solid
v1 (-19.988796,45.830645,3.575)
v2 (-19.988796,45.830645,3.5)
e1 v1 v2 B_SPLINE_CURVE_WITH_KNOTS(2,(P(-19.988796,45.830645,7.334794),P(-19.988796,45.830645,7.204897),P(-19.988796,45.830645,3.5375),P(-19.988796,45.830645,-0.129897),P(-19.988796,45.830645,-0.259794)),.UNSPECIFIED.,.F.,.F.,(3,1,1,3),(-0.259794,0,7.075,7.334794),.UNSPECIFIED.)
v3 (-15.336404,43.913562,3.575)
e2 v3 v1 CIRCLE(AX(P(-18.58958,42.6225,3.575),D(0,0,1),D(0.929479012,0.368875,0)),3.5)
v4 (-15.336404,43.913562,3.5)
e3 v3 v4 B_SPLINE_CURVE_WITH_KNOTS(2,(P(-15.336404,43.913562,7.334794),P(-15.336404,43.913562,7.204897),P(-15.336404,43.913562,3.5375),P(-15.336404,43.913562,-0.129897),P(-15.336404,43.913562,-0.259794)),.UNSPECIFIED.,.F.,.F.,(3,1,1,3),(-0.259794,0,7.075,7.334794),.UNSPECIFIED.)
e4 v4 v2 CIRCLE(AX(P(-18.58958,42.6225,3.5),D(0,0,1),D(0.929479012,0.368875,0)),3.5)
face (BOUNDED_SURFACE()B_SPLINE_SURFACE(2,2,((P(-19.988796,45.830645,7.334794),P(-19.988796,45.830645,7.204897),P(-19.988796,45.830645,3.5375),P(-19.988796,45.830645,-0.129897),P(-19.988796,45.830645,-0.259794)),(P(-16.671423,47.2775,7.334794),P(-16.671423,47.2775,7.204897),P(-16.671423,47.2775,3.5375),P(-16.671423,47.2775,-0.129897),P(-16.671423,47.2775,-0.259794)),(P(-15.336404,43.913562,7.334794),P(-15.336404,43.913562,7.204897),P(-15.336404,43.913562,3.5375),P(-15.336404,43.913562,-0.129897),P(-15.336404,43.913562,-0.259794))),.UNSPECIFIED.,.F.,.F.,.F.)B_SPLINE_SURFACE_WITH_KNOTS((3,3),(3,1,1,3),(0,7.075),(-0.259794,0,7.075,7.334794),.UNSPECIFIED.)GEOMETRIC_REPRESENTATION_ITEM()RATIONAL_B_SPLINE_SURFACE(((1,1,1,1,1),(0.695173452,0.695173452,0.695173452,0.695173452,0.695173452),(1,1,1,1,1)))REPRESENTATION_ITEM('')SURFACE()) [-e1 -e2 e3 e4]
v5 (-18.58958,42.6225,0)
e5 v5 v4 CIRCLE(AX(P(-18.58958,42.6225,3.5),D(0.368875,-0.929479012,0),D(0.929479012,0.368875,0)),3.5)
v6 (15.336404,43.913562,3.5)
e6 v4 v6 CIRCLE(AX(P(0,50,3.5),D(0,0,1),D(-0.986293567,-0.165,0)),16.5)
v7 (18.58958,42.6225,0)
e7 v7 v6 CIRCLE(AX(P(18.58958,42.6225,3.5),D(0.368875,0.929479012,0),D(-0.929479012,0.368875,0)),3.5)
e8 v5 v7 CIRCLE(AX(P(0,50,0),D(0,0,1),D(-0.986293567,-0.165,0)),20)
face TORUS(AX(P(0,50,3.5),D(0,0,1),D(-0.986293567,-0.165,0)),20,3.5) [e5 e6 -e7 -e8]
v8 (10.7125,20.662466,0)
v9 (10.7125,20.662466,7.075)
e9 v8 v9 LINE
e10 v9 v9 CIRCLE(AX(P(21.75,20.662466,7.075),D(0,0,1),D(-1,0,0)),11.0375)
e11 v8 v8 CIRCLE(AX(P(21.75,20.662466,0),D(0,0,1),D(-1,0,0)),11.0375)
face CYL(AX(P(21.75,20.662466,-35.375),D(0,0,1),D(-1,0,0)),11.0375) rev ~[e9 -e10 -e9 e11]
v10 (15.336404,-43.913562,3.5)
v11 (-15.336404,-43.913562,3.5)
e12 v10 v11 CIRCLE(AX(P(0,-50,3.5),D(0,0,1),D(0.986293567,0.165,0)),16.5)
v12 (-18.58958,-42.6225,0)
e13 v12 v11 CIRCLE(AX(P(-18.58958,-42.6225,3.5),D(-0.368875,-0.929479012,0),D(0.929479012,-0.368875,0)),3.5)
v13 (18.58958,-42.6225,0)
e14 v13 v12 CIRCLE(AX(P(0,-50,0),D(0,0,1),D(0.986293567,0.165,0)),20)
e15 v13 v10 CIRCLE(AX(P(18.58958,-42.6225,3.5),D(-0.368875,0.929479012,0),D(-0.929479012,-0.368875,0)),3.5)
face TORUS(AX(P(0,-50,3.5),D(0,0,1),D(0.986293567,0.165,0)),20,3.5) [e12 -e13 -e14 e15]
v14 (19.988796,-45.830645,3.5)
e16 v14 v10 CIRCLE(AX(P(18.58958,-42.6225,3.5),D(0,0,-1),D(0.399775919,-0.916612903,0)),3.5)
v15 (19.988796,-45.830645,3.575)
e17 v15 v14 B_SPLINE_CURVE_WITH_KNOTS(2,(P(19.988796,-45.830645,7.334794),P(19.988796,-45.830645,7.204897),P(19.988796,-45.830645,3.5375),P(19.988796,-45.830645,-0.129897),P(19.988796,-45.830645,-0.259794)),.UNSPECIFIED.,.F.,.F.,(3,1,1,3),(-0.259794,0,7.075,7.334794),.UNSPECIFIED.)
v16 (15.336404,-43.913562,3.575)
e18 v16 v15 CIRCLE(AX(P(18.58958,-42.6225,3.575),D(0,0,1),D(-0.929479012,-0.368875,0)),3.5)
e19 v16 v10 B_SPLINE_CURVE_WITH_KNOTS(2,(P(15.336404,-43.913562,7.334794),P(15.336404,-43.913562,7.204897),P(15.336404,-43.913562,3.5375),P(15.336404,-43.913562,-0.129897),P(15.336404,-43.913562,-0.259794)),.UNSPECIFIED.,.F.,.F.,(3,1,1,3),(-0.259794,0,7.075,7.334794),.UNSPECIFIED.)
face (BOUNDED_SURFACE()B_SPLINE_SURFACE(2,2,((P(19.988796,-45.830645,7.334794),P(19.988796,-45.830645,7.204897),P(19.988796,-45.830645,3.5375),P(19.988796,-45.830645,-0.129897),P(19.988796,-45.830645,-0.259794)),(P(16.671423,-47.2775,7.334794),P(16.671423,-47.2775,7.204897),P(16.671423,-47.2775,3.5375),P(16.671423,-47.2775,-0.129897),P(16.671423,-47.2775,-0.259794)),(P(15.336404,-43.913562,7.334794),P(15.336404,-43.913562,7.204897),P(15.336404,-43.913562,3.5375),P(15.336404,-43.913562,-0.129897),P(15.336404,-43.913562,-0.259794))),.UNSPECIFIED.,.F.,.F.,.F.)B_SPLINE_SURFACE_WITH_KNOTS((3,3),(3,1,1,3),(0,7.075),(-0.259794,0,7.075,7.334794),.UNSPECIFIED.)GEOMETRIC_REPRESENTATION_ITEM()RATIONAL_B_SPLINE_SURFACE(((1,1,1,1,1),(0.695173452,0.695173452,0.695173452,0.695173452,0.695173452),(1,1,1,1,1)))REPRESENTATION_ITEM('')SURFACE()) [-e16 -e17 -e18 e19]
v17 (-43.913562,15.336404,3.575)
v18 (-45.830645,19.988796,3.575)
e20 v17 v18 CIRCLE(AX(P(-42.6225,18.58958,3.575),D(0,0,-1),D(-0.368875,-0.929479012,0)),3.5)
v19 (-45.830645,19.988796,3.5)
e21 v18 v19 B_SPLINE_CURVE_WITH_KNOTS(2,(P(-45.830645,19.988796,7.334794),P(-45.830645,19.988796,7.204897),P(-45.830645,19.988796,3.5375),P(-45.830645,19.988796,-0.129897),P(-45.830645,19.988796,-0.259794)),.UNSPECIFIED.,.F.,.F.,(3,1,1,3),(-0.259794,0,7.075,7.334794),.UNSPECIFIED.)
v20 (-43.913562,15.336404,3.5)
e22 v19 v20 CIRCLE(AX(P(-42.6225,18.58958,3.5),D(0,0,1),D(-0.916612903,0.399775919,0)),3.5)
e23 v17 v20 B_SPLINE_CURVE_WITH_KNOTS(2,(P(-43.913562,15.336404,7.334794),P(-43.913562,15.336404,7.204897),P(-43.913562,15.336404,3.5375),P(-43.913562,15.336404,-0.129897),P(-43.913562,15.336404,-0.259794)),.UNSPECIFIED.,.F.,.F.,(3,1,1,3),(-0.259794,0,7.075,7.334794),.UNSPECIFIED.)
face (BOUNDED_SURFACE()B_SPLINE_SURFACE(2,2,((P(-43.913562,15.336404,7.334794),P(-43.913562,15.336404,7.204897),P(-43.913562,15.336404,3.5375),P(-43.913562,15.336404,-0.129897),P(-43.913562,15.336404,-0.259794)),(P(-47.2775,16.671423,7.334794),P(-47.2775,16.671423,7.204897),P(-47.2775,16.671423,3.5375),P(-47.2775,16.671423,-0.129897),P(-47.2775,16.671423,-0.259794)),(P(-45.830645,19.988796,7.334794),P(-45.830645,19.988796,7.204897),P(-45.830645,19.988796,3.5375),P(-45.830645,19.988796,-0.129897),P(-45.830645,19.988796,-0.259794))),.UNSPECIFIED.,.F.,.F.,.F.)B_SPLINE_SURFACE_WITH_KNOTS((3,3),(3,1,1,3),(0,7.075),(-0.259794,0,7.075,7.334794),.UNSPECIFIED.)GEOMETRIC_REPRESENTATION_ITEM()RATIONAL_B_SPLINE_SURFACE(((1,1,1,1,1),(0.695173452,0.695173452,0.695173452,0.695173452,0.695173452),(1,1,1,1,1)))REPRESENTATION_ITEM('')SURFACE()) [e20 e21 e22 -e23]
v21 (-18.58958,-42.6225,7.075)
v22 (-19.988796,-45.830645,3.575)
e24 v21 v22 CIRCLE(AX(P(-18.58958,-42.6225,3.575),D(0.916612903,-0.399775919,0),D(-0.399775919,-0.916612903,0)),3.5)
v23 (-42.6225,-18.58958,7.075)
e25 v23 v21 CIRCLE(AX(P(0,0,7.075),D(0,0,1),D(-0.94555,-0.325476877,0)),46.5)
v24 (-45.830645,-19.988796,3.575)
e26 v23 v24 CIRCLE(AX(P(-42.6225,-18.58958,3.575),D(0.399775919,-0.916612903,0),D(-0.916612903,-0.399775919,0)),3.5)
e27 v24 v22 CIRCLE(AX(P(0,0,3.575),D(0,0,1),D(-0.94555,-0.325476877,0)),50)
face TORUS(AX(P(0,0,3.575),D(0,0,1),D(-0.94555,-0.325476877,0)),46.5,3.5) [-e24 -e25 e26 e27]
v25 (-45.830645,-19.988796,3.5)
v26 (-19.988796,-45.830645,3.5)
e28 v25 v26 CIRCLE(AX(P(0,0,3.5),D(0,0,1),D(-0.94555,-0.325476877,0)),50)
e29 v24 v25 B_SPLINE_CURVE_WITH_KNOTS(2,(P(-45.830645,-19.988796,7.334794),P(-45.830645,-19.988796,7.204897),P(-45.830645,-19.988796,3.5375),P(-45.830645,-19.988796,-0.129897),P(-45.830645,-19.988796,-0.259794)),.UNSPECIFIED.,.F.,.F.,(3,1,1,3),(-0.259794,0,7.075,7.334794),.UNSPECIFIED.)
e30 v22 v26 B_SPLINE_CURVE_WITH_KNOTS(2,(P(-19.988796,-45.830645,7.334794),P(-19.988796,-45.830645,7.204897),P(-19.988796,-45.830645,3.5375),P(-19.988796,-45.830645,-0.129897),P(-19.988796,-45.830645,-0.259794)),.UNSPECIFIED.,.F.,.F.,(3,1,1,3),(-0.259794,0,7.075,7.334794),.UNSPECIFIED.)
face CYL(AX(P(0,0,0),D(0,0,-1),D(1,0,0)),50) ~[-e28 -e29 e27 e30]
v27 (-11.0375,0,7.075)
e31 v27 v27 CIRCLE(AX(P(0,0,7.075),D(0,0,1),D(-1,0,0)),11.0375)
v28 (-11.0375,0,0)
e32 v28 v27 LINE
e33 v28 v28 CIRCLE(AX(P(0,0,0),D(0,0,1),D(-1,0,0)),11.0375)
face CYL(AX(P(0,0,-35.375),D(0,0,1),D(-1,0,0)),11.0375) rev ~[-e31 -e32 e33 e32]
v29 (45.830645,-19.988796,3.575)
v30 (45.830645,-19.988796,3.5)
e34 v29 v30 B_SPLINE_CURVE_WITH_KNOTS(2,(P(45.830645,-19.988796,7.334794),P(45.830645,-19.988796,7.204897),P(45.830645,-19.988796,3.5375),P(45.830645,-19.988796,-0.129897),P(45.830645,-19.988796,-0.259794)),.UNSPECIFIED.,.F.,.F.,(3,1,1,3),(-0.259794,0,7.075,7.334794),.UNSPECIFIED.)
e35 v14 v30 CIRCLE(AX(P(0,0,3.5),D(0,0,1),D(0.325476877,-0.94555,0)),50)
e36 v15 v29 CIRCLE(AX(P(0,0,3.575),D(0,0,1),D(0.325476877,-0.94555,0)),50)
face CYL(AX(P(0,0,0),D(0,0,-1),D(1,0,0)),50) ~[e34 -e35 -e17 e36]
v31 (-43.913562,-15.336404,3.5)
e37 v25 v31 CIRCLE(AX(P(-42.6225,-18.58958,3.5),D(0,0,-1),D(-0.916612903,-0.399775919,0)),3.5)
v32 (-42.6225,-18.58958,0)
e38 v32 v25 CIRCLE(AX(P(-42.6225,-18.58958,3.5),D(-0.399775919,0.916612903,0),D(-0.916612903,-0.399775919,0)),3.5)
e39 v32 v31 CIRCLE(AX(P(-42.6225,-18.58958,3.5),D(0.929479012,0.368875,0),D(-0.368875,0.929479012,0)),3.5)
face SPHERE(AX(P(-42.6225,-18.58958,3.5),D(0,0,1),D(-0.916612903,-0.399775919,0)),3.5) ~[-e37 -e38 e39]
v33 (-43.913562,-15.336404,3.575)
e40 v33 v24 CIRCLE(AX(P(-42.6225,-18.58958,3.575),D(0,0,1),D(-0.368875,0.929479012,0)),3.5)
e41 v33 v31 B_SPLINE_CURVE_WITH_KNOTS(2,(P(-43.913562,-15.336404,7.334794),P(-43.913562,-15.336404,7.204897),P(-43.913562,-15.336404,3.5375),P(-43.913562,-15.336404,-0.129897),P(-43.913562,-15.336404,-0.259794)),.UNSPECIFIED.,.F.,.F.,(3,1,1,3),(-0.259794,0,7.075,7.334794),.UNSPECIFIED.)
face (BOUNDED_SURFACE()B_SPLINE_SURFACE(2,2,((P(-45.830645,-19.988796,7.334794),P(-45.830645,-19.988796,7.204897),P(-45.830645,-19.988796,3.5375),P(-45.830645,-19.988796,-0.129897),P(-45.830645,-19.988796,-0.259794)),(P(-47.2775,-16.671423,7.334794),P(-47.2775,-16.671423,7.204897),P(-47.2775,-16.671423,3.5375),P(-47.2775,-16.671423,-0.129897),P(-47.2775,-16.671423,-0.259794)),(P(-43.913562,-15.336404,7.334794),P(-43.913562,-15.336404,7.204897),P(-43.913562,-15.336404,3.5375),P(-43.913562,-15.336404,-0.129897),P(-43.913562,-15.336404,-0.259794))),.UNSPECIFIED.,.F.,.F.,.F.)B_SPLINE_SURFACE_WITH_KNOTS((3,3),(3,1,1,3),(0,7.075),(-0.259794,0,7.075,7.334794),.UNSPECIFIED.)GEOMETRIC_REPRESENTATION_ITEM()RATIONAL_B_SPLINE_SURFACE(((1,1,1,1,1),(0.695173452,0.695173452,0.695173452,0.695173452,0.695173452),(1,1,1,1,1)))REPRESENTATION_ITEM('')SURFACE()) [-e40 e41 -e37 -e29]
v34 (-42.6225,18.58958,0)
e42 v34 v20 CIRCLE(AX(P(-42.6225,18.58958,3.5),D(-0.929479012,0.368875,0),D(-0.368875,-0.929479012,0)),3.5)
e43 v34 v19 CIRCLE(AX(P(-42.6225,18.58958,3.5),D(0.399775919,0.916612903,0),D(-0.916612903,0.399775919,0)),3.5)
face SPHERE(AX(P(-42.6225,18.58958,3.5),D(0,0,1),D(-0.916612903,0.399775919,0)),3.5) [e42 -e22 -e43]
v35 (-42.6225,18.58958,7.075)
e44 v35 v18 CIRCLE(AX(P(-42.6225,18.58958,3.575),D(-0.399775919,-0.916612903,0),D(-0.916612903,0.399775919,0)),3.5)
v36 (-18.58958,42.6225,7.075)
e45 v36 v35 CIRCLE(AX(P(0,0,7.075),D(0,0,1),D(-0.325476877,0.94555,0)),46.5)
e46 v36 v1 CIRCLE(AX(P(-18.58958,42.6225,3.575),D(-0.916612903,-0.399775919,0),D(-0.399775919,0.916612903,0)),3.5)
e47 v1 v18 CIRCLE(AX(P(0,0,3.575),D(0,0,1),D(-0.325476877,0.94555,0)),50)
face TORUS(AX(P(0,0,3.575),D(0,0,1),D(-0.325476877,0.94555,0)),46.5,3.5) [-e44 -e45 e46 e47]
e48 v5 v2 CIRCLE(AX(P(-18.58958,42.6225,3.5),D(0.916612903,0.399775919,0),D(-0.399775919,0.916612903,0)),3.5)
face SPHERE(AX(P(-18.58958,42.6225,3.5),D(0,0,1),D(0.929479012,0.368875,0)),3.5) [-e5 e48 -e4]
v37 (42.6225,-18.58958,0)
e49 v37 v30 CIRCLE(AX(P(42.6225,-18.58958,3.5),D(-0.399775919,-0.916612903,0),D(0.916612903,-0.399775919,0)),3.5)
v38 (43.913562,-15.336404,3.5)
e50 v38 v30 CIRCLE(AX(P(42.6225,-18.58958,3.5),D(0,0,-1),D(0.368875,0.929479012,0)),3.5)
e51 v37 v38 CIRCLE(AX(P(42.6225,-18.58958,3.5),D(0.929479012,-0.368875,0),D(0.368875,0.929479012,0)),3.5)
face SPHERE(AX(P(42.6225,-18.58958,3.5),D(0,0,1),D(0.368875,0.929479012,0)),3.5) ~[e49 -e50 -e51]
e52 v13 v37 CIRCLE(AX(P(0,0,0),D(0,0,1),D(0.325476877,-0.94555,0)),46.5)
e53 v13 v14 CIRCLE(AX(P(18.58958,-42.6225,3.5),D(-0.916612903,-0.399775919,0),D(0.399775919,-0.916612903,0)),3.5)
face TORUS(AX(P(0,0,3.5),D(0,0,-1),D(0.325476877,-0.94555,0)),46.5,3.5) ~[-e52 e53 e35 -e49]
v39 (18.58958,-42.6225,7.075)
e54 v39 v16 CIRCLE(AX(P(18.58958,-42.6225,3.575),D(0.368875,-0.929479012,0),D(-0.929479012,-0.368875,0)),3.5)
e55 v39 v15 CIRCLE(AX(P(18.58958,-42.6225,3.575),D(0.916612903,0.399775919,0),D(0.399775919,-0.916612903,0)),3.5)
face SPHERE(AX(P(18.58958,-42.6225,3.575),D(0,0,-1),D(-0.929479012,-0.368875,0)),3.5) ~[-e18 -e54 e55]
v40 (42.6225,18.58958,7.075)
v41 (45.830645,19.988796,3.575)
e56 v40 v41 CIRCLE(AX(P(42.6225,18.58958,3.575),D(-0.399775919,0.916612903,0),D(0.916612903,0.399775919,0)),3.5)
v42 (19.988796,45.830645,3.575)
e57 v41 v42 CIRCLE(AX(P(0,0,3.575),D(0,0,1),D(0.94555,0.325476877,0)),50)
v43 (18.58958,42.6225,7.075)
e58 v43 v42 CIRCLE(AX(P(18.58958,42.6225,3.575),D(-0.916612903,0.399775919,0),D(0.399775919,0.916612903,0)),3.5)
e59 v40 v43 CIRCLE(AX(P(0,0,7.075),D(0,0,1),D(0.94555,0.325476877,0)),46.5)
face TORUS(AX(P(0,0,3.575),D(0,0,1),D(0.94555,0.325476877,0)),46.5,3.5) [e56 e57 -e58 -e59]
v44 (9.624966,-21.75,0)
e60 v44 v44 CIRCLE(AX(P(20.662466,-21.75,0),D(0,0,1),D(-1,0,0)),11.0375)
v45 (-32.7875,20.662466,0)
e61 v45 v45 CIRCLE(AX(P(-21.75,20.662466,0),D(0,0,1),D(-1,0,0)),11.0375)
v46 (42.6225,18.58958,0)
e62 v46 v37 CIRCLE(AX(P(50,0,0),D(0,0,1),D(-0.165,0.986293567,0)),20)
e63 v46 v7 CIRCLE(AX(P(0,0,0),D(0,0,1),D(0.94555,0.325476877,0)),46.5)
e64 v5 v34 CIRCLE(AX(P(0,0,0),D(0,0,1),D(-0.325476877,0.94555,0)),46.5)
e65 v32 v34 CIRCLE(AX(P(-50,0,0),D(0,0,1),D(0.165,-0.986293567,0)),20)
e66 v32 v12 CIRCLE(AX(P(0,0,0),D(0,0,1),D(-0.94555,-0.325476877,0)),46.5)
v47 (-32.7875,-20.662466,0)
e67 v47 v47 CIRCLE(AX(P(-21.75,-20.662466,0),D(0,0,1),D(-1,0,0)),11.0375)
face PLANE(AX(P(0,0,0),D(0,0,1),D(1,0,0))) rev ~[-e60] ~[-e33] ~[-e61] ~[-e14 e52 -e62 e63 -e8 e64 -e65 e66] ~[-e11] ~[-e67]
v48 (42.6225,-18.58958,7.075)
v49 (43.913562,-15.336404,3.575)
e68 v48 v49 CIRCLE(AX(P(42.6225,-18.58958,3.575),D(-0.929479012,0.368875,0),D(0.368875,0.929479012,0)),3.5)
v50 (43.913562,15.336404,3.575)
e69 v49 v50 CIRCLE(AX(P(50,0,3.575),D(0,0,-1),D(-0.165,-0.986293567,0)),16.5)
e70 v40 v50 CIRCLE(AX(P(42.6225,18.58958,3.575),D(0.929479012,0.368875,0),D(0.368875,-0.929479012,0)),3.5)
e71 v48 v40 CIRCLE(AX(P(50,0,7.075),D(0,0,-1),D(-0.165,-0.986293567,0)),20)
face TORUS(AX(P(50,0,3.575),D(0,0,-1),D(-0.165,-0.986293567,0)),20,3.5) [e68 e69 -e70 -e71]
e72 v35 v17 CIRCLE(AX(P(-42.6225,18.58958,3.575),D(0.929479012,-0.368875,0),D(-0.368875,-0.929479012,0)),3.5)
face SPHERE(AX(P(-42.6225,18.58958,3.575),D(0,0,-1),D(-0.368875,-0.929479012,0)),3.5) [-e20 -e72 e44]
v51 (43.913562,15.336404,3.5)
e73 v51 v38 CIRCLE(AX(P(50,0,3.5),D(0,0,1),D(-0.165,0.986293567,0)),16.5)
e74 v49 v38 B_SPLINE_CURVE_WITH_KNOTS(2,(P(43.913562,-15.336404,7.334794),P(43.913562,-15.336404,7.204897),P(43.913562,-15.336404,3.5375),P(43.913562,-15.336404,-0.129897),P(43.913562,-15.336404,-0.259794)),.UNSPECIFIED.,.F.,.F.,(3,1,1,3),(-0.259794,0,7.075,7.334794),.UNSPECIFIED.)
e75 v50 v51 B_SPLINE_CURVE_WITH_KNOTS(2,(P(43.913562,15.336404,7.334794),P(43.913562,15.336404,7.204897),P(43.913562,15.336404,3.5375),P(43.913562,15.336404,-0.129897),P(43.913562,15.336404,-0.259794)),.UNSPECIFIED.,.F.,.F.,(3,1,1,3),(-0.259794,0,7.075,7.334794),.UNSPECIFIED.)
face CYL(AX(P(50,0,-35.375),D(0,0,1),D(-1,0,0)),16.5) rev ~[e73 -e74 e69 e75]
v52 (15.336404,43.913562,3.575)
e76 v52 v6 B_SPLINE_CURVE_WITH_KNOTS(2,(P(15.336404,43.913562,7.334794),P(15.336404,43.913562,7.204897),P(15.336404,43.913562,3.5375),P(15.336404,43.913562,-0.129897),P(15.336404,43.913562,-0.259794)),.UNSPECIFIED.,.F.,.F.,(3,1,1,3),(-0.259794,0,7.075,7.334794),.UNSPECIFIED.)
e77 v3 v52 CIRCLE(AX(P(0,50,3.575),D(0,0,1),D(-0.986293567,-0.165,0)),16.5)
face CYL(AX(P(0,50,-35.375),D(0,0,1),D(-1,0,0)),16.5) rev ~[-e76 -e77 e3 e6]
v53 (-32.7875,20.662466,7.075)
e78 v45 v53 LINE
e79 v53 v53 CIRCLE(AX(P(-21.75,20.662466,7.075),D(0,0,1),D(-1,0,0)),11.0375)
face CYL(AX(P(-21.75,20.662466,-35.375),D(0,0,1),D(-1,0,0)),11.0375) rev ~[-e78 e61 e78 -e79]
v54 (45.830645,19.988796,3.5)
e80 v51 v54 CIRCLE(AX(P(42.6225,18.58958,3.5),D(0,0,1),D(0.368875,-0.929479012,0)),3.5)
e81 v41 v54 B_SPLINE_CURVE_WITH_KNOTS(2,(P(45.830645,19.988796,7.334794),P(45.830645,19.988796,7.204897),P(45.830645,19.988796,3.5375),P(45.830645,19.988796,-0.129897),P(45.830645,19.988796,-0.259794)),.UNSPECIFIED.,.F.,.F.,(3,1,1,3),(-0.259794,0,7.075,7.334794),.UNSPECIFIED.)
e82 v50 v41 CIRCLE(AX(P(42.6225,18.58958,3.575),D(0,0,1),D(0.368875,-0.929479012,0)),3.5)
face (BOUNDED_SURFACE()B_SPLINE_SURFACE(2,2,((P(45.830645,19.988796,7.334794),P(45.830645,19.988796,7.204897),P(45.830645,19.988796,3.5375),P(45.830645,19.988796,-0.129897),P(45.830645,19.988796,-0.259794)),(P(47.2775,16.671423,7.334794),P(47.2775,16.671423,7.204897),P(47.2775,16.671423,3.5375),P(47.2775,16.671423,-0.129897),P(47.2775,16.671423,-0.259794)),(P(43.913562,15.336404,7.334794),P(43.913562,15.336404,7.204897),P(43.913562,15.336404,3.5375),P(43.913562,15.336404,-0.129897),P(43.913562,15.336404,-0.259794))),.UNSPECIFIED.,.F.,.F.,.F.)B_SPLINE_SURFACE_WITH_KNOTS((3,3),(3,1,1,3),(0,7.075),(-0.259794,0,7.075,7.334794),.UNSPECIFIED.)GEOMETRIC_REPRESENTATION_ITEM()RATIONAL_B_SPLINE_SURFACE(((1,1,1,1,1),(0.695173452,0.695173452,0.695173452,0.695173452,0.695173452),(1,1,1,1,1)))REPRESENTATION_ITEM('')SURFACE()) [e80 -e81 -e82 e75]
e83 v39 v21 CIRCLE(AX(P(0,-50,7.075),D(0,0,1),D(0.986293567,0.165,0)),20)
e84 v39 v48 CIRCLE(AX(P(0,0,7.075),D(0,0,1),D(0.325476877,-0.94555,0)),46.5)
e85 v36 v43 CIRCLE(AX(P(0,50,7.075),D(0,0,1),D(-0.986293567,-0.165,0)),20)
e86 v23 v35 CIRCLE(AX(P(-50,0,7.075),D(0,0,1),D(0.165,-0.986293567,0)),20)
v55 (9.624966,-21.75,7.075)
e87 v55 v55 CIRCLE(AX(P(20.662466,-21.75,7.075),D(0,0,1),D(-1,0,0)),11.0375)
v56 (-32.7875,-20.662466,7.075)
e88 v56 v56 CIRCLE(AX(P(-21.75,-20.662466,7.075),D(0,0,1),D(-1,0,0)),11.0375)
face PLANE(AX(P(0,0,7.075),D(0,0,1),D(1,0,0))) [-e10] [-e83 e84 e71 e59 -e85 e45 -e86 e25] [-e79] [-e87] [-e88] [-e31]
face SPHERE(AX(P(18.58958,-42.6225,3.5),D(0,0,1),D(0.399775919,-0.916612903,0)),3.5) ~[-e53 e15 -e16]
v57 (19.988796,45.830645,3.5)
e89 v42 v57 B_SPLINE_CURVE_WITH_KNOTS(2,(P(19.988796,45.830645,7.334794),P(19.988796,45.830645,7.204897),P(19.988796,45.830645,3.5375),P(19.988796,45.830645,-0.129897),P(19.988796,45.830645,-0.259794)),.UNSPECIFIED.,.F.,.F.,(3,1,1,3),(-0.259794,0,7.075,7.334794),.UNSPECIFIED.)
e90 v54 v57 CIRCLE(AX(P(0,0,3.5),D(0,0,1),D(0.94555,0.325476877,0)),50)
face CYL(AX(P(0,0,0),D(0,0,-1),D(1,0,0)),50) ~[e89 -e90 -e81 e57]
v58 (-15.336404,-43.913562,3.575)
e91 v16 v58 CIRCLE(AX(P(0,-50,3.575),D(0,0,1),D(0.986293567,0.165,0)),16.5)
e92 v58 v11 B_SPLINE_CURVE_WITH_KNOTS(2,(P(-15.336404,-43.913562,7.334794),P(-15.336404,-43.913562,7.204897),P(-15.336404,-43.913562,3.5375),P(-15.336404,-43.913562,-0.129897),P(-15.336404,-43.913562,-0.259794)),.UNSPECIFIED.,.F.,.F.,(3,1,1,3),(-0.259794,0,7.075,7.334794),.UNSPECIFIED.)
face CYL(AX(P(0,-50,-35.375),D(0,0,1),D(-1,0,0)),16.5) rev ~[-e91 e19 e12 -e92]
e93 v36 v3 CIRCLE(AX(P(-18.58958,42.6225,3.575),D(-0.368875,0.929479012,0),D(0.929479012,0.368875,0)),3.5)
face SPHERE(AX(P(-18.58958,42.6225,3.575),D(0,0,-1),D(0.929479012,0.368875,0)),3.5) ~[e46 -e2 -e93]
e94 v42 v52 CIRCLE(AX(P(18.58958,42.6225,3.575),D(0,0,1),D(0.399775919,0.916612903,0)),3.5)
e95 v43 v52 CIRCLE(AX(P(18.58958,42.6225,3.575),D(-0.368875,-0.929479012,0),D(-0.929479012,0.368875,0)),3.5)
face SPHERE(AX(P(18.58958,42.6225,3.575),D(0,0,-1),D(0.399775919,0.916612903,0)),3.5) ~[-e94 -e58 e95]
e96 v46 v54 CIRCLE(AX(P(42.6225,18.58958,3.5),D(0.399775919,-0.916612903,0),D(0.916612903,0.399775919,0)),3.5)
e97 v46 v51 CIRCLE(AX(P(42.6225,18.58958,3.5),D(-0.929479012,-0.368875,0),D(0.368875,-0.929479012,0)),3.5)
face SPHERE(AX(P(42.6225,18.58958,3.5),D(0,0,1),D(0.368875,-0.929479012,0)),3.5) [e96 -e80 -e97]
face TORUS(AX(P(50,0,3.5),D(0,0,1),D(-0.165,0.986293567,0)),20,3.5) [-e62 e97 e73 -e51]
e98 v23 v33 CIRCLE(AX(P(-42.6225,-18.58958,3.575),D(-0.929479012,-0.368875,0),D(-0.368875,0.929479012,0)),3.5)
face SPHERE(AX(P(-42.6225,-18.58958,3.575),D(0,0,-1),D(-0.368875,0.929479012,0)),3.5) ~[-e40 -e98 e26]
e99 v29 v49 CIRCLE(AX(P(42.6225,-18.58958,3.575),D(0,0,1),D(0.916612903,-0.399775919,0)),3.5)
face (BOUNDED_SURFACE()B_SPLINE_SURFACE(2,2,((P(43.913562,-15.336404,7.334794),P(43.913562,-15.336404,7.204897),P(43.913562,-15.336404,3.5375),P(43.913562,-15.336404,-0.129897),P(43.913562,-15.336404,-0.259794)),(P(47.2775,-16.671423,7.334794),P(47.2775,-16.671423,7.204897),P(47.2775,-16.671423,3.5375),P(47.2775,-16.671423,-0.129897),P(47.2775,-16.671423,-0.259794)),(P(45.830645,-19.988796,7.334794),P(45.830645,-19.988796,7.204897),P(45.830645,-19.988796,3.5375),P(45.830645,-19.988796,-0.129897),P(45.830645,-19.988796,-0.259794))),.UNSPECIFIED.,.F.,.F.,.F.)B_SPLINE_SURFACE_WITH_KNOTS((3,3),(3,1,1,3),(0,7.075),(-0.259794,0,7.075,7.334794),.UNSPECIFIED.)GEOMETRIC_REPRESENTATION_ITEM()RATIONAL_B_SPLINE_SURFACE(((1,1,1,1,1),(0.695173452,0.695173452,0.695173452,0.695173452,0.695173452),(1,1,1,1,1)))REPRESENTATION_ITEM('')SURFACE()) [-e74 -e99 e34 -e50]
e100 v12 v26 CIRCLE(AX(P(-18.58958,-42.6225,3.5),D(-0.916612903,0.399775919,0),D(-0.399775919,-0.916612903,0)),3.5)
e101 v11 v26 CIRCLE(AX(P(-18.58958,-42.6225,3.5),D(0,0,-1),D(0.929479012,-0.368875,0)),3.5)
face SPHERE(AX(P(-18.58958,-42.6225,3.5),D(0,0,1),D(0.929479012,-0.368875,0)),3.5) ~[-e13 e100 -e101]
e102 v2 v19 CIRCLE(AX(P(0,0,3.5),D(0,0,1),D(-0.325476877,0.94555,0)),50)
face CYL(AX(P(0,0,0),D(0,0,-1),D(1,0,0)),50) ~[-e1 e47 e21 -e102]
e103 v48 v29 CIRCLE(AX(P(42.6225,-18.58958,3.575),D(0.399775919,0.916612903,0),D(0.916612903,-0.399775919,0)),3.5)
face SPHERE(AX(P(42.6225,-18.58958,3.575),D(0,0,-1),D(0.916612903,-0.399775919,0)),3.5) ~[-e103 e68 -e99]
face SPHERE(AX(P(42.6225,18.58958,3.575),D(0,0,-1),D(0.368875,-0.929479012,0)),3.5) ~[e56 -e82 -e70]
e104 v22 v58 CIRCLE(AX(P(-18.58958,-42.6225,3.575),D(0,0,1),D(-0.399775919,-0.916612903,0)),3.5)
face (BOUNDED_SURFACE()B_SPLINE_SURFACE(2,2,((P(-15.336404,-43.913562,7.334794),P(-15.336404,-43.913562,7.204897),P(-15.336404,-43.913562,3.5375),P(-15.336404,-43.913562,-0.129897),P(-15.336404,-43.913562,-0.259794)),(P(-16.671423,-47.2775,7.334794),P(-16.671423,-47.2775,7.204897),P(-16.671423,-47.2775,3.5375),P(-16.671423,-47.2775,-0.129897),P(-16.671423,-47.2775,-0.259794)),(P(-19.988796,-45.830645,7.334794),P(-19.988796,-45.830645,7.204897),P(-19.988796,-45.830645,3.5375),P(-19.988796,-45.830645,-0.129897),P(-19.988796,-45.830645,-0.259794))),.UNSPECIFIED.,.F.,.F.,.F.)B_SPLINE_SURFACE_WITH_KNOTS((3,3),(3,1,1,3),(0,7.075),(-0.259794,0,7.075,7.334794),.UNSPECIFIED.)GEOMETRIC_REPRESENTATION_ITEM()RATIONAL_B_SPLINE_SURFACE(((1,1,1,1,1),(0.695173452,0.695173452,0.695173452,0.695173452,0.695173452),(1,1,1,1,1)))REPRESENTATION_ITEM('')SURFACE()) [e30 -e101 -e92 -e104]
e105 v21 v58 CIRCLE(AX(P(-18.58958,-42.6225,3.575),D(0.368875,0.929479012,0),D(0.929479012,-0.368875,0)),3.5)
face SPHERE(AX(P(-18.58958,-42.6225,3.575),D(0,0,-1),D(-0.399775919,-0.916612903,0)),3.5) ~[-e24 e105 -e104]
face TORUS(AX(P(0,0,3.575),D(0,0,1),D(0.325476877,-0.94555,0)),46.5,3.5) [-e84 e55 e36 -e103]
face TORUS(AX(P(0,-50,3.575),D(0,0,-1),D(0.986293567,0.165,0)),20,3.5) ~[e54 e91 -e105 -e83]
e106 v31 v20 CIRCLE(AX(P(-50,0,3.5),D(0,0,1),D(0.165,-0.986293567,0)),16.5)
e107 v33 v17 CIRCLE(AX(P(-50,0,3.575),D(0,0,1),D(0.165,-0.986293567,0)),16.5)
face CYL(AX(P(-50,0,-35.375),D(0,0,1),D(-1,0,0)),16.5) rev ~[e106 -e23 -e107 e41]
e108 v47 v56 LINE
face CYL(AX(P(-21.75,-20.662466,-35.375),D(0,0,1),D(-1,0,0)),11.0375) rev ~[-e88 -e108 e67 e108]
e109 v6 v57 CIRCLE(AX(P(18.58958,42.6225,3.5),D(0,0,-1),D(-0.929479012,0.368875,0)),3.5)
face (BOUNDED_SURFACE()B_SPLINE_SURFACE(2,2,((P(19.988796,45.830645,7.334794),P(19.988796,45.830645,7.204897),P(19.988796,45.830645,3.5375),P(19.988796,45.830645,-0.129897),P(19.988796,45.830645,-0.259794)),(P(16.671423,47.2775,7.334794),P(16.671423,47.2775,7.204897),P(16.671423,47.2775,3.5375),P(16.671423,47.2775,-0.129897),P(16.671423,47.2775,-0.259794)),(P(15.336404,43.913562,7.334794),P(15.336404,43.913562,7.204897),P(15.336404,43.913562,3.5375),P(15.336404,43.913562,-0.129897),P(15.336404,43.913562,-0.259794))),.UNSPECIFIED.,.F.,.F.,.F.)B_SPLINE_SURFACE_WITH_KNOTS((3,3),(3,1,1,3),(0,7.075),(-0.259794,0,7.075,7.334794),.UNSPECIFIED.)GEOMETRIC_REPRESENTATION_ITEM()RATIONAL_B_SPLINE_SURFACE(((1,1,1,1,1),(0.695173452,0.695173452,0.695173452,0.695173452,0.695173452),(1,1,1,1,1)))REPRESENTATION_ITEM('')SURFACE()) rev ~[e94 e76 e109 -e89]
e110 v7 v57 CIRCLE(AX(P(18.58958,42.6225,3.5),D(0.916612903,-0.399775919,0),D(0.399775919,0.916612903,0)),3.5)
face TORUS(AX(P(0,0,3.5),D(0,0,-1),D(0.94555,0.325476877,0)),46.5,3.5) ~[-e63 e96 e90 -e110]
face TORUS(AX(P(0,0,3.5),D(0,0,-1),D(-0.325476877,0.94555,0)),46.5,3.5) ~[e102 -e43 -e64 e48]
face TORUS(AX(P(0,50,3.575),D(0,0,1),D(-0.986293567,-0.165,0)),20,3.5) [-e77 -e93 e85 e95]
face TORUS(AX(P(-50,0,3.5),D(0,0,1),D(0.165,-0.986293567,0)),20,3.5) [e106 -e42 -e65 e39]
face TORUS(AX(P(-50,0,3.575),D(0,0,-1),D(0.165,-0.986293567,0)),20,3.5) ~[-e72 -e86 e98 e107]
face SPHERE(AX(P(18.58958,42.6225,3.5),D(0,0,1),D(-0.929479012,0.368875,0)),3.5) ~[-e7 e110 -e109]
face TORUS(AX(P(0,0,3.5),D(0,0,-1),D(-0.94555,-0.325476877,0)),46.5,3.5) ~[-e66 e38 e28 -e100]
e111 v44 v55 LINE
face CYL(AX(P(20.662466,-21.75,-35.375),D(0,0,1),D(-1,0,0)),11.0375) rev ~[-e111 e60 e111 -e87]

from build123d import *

# Parameters (mm, degrees)
F0_R     = 50
F1_DEPTH = 7.075
F2_D     = 22.075
F2_DEPTH = 35.375
F2_TIP   = 6.6319990825
F3_D     = 33
F3_DEPTH = 35.375
F3_TIP   = 9.914200214
F4_R     = 3.5


with BuildPart() as f1:
    # F0 (on Top) → F1 (new body)
    with BuildSketch(Plane.XY):
        Circle(F0_R)
    extrude(amount=F1_DEPTH)

    # F2
    with Locations(Plane(origin=(0, 0, 0), x_dir=(1, 0, 0), z_dir=(0, 0, -1))):
        with Locations((0, 0), (-21.75, -20.6624659709), (21.75, -20.6624659709), (20.6624659709, 21.75), (-21.75, 20.6624659709)):
            Hole(F2_D / 2, depth=F2_DEPTH)
            with Locations((0, 0, -(F2_DEPTH + F2_TIP / 2))):  # 118° drill point
                Cone(0, F2_D / 2, F2_TIP, mode=Mode.SUBTRACT)

    # F3
    with Locations(Plane(origin=(0, 0, 0), x_dir=(1, 0, 0), z_dir=(0, 0, -1))):
        with Locations((0, 50), (-50, 0), (0, -50), (50, 0)):
            Hole(F3_D / 2, depth=F3_DEPTH)
            with Locations((0, 0, -(F3_DEPTH + F3_TIP / 2))):  # 118° drill point
                Cone(0, F3_D / 2, F3_TIP, mode=Mode.SUBTRACT)

    # F4
    f4_edges = [f1.edges().sort_by_distance(p)[0] for p in [
        (35.355339, 35.355339, 0),
        (16.273844, 47.2775, 3.5375),
        (35.355339, 35.355339, 7.075),
        (47.2775, 16.273844, 3.5375),
        (33.5, 0, 7.075),
        (47.2775, -16.273844, 3.5375),
        (33.5, 0, 0),
        (35.355339, -35.355339, 7.075),
        (16.273844, -47.2775, 3.5375),
        (35.355339, -35.355339, 0),
        (0, -33.5, 7.075),
        (-16.273844, -47.2775, 3.5375),
        (0, -33.5, 0),
        (-35.355339, -35.355339, 7.075),
        (-47.2775, -16.273844, 3.5375),
        (-35.355339, -35.355339, 0),
        (-33.5, 0, 0),
        (-47.2775, 16.273844, 3.5375),
        (-33.5, 0, 7.075),
        (-35.355339, 35.355339, 0),
        (-35.355339, 35.355339, 7.075),
        (-16.273844, 47.2775, 3.5375),
        (0, 33.5, 7.075),
        (0, 33.5, 0),
    ]]
    fillet(f4_edges, radius=F4_R)


solid = f1.part
